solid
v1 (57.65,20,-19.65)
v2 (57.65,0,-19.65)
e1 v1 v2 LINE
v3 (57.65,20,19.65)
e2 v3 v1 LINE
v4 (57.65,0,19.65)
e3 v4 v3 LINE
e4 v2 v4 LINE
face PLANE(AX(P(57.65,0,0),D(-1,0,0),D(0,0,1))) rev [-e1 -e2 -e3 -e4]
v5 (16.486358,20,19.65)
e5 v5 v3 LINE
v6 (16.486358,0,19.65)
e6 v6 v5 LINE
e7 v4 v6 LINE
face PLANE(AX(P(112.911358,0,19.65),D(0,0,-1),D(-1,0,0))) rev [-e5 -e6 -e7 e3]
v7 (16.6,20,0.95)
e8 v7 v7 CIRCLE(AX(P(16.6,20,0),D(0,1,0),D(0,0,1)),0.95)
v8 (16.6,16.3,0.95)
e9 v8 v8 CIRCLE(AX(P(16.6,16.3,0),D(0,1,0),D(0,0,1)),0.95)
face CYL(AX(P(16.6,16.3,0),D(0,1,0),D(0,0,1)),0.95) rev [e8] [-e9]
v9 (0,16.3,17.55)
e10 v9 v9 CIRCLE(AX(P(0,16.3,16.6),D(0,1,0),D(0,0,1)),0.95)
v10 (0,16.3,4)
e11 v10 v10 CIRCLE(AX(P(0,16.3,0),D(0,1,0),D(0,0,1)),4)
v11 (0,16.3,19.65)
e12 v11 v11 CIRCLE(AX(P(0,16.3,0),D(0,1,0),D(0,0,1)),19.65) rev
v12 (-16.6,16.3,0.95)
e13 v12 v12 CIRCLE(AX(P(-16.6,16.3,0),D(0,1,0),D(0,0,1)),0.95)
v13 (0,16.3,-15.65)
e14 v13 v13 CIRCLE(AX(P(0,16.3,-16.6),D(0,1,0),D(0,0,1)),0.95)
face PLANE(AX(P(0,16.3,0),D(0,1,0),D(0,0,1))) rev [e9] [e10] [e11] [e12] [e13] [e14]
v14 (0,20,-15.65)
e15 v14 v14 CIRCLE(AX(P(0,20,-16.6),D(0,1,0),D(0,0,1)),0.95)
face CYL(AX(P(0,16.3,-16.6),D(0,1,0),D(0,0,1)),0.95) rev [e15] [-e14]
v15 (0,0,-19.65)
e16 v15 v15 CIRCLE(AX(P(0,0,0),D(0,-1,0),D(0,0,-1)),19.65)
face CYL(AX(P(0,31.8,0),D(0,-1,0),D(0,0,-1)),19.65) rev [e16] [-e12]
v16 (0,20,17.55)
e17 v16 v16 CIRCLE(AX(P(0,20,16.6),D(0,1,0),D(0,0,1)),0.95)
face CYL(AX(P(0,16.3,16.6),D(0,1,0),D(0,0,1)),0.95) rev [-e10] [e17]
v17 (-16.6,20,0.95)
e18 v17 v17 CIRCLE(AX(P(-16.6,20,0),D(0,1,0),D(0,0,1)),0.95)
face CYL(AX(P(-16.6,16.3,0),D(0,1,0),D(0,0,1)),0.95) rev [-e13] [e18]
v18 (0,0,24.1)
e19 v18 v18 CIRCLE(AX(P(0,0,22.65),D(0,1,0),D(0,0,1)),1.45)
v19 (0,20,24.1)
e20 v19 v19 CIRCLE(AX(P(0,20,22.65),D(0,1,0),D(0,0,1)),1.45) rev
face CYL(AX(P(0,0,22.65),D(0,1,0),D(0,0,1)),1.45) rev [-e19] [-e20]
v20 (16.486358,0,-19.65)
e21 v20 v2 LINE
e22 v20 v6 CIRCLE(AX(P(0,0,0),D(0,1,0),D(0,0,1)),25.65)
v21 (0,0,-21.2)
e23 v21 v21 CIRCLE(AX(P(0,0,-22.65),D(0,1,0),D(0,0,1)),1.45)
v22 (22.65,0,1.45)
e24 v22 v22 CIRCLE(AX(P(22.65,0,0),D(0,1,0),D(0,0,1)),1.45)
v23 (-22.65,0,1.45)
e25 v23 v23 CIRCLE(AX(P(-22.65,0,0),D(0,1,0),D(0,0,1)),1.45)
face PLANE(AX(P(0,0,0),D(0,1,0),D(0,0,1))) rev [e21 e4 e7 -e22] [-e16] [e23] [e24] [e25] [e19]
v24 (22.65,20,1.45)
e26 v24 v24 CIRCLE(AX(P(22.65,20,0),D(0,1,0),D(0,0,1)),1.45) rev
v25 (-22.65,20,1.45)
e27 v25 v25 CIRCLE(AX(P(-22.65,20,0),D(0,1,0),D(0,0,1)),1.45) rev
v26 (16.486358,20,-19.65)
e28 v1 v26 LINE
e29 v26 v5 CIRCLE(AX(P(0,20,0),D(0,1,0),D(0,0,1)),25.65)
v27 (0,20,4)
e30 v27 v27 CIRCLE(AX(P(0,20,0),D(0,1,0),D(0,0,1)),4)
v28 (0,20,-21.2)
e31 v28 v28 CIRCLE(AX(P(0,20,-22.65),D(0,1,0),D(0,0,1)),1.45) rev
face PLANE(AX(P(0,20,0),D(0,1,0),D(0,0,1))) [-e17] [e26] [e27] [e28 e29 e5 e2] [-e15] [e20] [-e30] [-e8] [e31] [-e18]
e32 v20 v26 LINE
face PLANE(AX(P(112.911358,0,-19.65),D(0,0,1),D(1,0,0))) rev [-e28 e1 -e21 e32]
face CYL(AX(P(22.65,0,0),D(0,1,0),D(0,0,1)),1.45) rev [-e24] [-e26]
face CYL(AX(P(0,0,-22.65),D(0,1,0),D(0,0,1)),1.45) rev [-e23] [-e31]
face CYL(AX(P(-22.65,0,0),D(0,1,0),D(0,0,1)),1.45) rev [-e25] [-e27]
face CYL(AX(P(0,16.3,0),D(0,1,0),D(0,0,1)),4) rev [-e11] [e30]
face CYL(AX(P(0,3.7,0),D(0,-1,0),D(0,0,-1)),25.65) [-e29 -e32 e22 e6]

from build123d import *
from build123d.topology import SkipClean

# Parameters (mm, degrees)
SKETCH1_R               = 0.95
SKETCH1_R_2             = 4
BOSS_EXTRUDE2_DEPTH     = 3.7
SKETCH5_W               = 40.16
SKETCH5_H               = 20.39
SKETCH5_R               = 19.65
BOSS_EXTRUDE3_DEPTH     = 28.1
CUT_EXTRUDE1_REACH      = 133.143
SKETCH6_W               = 40.16
SKETCH6_H               = 28.1
CUT_EXTRUDE2_REACH      = 140.14
SKETCH7_W               = 29.863740461
SKETCH7_H               = 10
CUT_EXTRUDE3_DEPTH      = 129.730214499
CUT_EXTRUDE3_DEPTH_BACK = 129.730214499
SKETCH8_R               = 1.45
SKETCH9_R               = 0.95
CUT_EXTRUDE4_DEPTH      = 12
CUT_EXTRUDE5_DEPTH      = 129.730214499
FILLET1_R               = 2
CUT_EXTRUDE6_DEPTH      = 11.8
BOSS_EXTRUDE4_START     = -3.7
SKETCH14_R              = 19.65
SKETCH14_R_2            = 0.95
SKETCH14_R_3            = 4
BOSS_EXTRUDE4_DEPTH     = 3.7
CUT_EXTRUDE7_REACH      = 130.73
SKETCH15_R              = 19.65
SKETCH16_W              = 39.3
SKETCH16_H              = 31.8
CUT_EXTRUDE8_DEPTH      = 93.779590967


with BuildPart() as part:
    # Sketch1 → Boss-Extrude2 (new body)
    with BuildSketch(Plane(origin=(0, 0, 0), x_dir=(1, 0, 0), z_dir=(0, 1, 0))):
        with BuildLine():
            Line((96.425, 25.65), (0, 25.65))
            ThreePointArc((0, 25.65), (-25.65, 0), (0, -25.65))
            Line((0, -25.65), (96.425, -25.65))
            ThreePointArc((96.425, -25.65), (122.075, 0), (96.425, 25.65))
        make_face()
        with Locations((0, 16.6)):
            Circle(SKETCH1_R, mode=Mode.SUBTRACT)
        with Locations((0, -16.6)):
            Circle(SKETCH1_R, mode=Mode.SUBTRACT)
        with Locations((-16.6, 0)):
            Circle(SKETCH1_R, mode=Mode.SUBTRACT)
        Circle(SKETCH1_R_2, mode=Mode.SUBTRACT)
        with Locations((16.6, 0)):
            Circle(SKETCH1_R, mode=Mode.SUBTRACT)
    extrude(amount=BOSS_EXTRUDE2_DEPTH)

    # Sketch5 → Boss-Extrude3 (add)
    with BuildSketch(Plane(origin=(0, 3.7, 0), x_dir=(1, 0, 0), z_dir=(0, 1, 0))):
        with BuildLine():
            Line((96.425, 25.65), (0, 25.65))
            ThreePointArc((0, 25.65), (-25.65, 0), (0, -25.65))
            Line((0, -25.65), (96.425, -25.65))
            ThreePointArc((96.425, -25.65), (122.075, 0), (96.425, 25.65))
        make_face()
        with Locations((86.23, 0)):
            Rectangle(SKETCH5_W, SKETCH5_H, mode=Mode.SUBTRACT)
        Circle(SKETCH5_R, mode=Mode.SUBTRACT)
    extrude(amount=BOSS_EXTRUDE3_DEPTH)

    # Sketch6 → Cut-Extrude1 (cut, up to next)
    with BuildSketch(Plane.XY.offset(-10.195), mode=Mode.PRIVATE) as cut_extrude1_sk1:
        with Locations((86.23, 17.75)):
            Rectangle(SKETCH6_W, SKETCH6_H)
    cut_extrude1_tool1 = extrude(cut_extrude1_sk1.sketch, amount=-CUT_EXTRUDE1_REACH, mode=Mode.PRIVATE) & part.part
    add(cut_extrude1_tool1.solids().sort_by_distance((86.23, 17.75, -10.195))[0], mode=Mode.SUBTRACT)

    # Sketch7 → Cut-Extrude2 (cut, up to next)
    with BuildSketch(Plane.ZY.offset(-106.31), mode=Mode.PRIVATE) as cut_extrude2_sk1:
        with Locations((-8.736870231, 8.7)):
            Rectangle(SKETCH7_W, SKETCH7_H)
    cut_extrude2_tool1 = extrude(cut_extrude2_sk1.sketch, amount=-CUT_EXTRUDE2_REACH, mode=Mode.PRIVATE) & part.part
    add(cut_extrude2_tool1.solids().sort_by_distance((106.31, 8.7, -8.73687))[0], mode=Mode.SUBTRACT)

    # Sketch8 → Cut-Extrude3 (cut, two sides: drawn at the far end of the back side and taken through both)
    with BuildSketch(Plane(origin=(0, 31.8, 0), x_dir=(1, 0, 0), z_dir=(0, 1, 0)).offset(-CUT_EXTRUDE3_DEPTH_BACK)):
        with Locations((22.65, 0)):
            Circle(SKETCH8_R)
        with Locations((0, -22.65)):
            Circle(SKETCH8_R)
        with Locations((-22.65, 0)):
            Circle(SKETCH8_R)
        with Locations((0, 22.65)):
            Circle(SKETCH8_R)
    extrude(amount=CUT_EXTRUDE3_DEPTH + CUT_EXTRUDE3_DEPTH_BACK, mode=Mode.SUBTRACT)

    # Sketch9 → Cut-Extrude4 (cut)
    with BuildSketch(Plane(origin=(0, 31.8, 0), x_dir=(1, 0, 0), z_dir=(0, 1, 0))):
        with Locations((61.88, -4.95)):
            Circle(SKETCH9_R)
        with Locations((61.88, 4.95)):
            Circle(SKETCH9_R)
        with Locations((109.756875612, -4.95)):
            Circle(SKETCH9_R)
        with Locations((109.756875612, 4.95)):
            Circle(SKETCH9_R)
    extrude(amount=-CUT_EXTRUDE4_DEPTH, mode=Mode.SUBTRACT)

    # Sketch12 → Cut-Extrude5 (cut, through all)
    with SkipClean():  # the faces are left unmerged after this step: merging them gives an invalid solid
        with BuildSketch(Plane(origin=(0, 31.8, 0), x_dir=(1, 0, 0), z_dir=(0, 1, 0))):
            with BuildLine():
                Line((0, 25.65), (96.425, 25.65))
                ThreePointArc((96.425, 25.65), (105.19711491, 24.103371134), (112.911357997, 19.65))
                Line((112.911357997, 19.65), (16.486357997, 19.65))
                ThreePointArc((16.486357997, 19.65), (8.77211491, 24.103371134), (0, 25.65))
            make_face()
            with BuildLine():
                Line((0, -25.65), (96.425, -25.65))
                ThreePointArc((96.425, -25.65), (105.19711491, -24.103371134), (112.911357997, -19.65))
                Line((112.911357997, -19.65), (16.486357997, -19.65))
                ThreePointArc((16.486357997, -19.65), (8.77211491, -24.103371134), (0, -25.65))
            make_face()
        extrude(amount=-CUT_EXTRUDE5_DEPTH, mode=Mode.SUBTRACT)

    # Fillet1
    fillet1_edges = [part.edges().sort_by_distance(p)[0] for p in [
        (106.31, 22.75, -19.65),
        (66.15, 17.75, -19.65),
    ]]
    fillet(fillet1_edges, radius=FILLET1_R)

    # Sketch13 → Cut-Extrude6 (cut)
    with SkipClean():  # the faces are left unmerged after this step: merging them gives an invalid solid
        with BuildSketch(Plane(origin=(0, 31.8, 0), x_dir=(1, 0, 0), z_dir=(0, 1, 0))):
            with BuildLine():
                Line((57.65, 19.65), (57.65, -19.65))
                Line((57.65, -19.65), (16.486357997, -19.65))
                ThreePointArc((16.486357997, -19.65), (-25.65, 0), (16.486357997, 19.65))
                Line((16.486357997, 19.65), (57.65, 19.65))
            make_face()
        extrude(amount=-CUT_EXTRUDE6_DEPTH, mode=Mode.SUBTRACT)

    # Sketch14 → Boss-Extrude4 (add)
    with SkipClean():  # the faces are left unmerged after this step: merging them gives an invalid solid
        with BuildSketch(Plane(origin=(0, 20, 0), x_dir=(1, 0, 0), z_dir=(0, 1, 0)).offset(BOSS_EXTRUDE4_START)):
            Circle(SKETCH14_R)
            with Locations((0, -16.6)):
                Circle(SKETCH14_R_2, mode=Mode.SUBTRACT)
            with Locations((-16.6, 0)):
                Circle(SKETCH14_R_2, mode=Mode.SUBTRACT)
            Circle(SKETCH14_R_3, mode=Mode.SUBTRACT)
            with Locations((16.6, 0)):
                Circle(SKETCH14_R_2, mode=Mode.SUBTRACT)
            with Locations((0, 16.6)):
                Circle(SKETCH14_R_2, mode=Mode.SUBTRACT)
        extrude(amount=BOSS_EXTRUDE4_DEPTH)

    # Sketch15 → Cut-Extrude7 (cut, up to next)
    with BuildSketch(Plane.XZ, mode=Mode.PRIVATE) as cut_extrude7_sk1:
        Circle(SKETCH15_R)
    cut_extrude7_tool1 = extrude(cut_extrude7_sk1.sketch, amount=-CUT_EXTRUDE7_REACH, mode=Mode.PRIVATE) & part.part
    add(cut_extrude7_tool1.solids().sort_by_distance((0, 0, 0))[0], mode=Mode.SUBTRACT)

    # Sketch16 → Cut-Extrude8 (cut, through all)
    with SkipClean():  # the faces are left unmerged after this step: merging them gives an invalid solid
        with BuildSketch(Plane.ZY.offset(-57.65)):
            with Locations((0, 15.9)):
                Rectangle(SKETCH16_W, SKETCH16_H)
        extrude(amount=-CUT_EXTRUDE8_DEPTH, mode=Mode.SUBTRACT)


solid = part.part
